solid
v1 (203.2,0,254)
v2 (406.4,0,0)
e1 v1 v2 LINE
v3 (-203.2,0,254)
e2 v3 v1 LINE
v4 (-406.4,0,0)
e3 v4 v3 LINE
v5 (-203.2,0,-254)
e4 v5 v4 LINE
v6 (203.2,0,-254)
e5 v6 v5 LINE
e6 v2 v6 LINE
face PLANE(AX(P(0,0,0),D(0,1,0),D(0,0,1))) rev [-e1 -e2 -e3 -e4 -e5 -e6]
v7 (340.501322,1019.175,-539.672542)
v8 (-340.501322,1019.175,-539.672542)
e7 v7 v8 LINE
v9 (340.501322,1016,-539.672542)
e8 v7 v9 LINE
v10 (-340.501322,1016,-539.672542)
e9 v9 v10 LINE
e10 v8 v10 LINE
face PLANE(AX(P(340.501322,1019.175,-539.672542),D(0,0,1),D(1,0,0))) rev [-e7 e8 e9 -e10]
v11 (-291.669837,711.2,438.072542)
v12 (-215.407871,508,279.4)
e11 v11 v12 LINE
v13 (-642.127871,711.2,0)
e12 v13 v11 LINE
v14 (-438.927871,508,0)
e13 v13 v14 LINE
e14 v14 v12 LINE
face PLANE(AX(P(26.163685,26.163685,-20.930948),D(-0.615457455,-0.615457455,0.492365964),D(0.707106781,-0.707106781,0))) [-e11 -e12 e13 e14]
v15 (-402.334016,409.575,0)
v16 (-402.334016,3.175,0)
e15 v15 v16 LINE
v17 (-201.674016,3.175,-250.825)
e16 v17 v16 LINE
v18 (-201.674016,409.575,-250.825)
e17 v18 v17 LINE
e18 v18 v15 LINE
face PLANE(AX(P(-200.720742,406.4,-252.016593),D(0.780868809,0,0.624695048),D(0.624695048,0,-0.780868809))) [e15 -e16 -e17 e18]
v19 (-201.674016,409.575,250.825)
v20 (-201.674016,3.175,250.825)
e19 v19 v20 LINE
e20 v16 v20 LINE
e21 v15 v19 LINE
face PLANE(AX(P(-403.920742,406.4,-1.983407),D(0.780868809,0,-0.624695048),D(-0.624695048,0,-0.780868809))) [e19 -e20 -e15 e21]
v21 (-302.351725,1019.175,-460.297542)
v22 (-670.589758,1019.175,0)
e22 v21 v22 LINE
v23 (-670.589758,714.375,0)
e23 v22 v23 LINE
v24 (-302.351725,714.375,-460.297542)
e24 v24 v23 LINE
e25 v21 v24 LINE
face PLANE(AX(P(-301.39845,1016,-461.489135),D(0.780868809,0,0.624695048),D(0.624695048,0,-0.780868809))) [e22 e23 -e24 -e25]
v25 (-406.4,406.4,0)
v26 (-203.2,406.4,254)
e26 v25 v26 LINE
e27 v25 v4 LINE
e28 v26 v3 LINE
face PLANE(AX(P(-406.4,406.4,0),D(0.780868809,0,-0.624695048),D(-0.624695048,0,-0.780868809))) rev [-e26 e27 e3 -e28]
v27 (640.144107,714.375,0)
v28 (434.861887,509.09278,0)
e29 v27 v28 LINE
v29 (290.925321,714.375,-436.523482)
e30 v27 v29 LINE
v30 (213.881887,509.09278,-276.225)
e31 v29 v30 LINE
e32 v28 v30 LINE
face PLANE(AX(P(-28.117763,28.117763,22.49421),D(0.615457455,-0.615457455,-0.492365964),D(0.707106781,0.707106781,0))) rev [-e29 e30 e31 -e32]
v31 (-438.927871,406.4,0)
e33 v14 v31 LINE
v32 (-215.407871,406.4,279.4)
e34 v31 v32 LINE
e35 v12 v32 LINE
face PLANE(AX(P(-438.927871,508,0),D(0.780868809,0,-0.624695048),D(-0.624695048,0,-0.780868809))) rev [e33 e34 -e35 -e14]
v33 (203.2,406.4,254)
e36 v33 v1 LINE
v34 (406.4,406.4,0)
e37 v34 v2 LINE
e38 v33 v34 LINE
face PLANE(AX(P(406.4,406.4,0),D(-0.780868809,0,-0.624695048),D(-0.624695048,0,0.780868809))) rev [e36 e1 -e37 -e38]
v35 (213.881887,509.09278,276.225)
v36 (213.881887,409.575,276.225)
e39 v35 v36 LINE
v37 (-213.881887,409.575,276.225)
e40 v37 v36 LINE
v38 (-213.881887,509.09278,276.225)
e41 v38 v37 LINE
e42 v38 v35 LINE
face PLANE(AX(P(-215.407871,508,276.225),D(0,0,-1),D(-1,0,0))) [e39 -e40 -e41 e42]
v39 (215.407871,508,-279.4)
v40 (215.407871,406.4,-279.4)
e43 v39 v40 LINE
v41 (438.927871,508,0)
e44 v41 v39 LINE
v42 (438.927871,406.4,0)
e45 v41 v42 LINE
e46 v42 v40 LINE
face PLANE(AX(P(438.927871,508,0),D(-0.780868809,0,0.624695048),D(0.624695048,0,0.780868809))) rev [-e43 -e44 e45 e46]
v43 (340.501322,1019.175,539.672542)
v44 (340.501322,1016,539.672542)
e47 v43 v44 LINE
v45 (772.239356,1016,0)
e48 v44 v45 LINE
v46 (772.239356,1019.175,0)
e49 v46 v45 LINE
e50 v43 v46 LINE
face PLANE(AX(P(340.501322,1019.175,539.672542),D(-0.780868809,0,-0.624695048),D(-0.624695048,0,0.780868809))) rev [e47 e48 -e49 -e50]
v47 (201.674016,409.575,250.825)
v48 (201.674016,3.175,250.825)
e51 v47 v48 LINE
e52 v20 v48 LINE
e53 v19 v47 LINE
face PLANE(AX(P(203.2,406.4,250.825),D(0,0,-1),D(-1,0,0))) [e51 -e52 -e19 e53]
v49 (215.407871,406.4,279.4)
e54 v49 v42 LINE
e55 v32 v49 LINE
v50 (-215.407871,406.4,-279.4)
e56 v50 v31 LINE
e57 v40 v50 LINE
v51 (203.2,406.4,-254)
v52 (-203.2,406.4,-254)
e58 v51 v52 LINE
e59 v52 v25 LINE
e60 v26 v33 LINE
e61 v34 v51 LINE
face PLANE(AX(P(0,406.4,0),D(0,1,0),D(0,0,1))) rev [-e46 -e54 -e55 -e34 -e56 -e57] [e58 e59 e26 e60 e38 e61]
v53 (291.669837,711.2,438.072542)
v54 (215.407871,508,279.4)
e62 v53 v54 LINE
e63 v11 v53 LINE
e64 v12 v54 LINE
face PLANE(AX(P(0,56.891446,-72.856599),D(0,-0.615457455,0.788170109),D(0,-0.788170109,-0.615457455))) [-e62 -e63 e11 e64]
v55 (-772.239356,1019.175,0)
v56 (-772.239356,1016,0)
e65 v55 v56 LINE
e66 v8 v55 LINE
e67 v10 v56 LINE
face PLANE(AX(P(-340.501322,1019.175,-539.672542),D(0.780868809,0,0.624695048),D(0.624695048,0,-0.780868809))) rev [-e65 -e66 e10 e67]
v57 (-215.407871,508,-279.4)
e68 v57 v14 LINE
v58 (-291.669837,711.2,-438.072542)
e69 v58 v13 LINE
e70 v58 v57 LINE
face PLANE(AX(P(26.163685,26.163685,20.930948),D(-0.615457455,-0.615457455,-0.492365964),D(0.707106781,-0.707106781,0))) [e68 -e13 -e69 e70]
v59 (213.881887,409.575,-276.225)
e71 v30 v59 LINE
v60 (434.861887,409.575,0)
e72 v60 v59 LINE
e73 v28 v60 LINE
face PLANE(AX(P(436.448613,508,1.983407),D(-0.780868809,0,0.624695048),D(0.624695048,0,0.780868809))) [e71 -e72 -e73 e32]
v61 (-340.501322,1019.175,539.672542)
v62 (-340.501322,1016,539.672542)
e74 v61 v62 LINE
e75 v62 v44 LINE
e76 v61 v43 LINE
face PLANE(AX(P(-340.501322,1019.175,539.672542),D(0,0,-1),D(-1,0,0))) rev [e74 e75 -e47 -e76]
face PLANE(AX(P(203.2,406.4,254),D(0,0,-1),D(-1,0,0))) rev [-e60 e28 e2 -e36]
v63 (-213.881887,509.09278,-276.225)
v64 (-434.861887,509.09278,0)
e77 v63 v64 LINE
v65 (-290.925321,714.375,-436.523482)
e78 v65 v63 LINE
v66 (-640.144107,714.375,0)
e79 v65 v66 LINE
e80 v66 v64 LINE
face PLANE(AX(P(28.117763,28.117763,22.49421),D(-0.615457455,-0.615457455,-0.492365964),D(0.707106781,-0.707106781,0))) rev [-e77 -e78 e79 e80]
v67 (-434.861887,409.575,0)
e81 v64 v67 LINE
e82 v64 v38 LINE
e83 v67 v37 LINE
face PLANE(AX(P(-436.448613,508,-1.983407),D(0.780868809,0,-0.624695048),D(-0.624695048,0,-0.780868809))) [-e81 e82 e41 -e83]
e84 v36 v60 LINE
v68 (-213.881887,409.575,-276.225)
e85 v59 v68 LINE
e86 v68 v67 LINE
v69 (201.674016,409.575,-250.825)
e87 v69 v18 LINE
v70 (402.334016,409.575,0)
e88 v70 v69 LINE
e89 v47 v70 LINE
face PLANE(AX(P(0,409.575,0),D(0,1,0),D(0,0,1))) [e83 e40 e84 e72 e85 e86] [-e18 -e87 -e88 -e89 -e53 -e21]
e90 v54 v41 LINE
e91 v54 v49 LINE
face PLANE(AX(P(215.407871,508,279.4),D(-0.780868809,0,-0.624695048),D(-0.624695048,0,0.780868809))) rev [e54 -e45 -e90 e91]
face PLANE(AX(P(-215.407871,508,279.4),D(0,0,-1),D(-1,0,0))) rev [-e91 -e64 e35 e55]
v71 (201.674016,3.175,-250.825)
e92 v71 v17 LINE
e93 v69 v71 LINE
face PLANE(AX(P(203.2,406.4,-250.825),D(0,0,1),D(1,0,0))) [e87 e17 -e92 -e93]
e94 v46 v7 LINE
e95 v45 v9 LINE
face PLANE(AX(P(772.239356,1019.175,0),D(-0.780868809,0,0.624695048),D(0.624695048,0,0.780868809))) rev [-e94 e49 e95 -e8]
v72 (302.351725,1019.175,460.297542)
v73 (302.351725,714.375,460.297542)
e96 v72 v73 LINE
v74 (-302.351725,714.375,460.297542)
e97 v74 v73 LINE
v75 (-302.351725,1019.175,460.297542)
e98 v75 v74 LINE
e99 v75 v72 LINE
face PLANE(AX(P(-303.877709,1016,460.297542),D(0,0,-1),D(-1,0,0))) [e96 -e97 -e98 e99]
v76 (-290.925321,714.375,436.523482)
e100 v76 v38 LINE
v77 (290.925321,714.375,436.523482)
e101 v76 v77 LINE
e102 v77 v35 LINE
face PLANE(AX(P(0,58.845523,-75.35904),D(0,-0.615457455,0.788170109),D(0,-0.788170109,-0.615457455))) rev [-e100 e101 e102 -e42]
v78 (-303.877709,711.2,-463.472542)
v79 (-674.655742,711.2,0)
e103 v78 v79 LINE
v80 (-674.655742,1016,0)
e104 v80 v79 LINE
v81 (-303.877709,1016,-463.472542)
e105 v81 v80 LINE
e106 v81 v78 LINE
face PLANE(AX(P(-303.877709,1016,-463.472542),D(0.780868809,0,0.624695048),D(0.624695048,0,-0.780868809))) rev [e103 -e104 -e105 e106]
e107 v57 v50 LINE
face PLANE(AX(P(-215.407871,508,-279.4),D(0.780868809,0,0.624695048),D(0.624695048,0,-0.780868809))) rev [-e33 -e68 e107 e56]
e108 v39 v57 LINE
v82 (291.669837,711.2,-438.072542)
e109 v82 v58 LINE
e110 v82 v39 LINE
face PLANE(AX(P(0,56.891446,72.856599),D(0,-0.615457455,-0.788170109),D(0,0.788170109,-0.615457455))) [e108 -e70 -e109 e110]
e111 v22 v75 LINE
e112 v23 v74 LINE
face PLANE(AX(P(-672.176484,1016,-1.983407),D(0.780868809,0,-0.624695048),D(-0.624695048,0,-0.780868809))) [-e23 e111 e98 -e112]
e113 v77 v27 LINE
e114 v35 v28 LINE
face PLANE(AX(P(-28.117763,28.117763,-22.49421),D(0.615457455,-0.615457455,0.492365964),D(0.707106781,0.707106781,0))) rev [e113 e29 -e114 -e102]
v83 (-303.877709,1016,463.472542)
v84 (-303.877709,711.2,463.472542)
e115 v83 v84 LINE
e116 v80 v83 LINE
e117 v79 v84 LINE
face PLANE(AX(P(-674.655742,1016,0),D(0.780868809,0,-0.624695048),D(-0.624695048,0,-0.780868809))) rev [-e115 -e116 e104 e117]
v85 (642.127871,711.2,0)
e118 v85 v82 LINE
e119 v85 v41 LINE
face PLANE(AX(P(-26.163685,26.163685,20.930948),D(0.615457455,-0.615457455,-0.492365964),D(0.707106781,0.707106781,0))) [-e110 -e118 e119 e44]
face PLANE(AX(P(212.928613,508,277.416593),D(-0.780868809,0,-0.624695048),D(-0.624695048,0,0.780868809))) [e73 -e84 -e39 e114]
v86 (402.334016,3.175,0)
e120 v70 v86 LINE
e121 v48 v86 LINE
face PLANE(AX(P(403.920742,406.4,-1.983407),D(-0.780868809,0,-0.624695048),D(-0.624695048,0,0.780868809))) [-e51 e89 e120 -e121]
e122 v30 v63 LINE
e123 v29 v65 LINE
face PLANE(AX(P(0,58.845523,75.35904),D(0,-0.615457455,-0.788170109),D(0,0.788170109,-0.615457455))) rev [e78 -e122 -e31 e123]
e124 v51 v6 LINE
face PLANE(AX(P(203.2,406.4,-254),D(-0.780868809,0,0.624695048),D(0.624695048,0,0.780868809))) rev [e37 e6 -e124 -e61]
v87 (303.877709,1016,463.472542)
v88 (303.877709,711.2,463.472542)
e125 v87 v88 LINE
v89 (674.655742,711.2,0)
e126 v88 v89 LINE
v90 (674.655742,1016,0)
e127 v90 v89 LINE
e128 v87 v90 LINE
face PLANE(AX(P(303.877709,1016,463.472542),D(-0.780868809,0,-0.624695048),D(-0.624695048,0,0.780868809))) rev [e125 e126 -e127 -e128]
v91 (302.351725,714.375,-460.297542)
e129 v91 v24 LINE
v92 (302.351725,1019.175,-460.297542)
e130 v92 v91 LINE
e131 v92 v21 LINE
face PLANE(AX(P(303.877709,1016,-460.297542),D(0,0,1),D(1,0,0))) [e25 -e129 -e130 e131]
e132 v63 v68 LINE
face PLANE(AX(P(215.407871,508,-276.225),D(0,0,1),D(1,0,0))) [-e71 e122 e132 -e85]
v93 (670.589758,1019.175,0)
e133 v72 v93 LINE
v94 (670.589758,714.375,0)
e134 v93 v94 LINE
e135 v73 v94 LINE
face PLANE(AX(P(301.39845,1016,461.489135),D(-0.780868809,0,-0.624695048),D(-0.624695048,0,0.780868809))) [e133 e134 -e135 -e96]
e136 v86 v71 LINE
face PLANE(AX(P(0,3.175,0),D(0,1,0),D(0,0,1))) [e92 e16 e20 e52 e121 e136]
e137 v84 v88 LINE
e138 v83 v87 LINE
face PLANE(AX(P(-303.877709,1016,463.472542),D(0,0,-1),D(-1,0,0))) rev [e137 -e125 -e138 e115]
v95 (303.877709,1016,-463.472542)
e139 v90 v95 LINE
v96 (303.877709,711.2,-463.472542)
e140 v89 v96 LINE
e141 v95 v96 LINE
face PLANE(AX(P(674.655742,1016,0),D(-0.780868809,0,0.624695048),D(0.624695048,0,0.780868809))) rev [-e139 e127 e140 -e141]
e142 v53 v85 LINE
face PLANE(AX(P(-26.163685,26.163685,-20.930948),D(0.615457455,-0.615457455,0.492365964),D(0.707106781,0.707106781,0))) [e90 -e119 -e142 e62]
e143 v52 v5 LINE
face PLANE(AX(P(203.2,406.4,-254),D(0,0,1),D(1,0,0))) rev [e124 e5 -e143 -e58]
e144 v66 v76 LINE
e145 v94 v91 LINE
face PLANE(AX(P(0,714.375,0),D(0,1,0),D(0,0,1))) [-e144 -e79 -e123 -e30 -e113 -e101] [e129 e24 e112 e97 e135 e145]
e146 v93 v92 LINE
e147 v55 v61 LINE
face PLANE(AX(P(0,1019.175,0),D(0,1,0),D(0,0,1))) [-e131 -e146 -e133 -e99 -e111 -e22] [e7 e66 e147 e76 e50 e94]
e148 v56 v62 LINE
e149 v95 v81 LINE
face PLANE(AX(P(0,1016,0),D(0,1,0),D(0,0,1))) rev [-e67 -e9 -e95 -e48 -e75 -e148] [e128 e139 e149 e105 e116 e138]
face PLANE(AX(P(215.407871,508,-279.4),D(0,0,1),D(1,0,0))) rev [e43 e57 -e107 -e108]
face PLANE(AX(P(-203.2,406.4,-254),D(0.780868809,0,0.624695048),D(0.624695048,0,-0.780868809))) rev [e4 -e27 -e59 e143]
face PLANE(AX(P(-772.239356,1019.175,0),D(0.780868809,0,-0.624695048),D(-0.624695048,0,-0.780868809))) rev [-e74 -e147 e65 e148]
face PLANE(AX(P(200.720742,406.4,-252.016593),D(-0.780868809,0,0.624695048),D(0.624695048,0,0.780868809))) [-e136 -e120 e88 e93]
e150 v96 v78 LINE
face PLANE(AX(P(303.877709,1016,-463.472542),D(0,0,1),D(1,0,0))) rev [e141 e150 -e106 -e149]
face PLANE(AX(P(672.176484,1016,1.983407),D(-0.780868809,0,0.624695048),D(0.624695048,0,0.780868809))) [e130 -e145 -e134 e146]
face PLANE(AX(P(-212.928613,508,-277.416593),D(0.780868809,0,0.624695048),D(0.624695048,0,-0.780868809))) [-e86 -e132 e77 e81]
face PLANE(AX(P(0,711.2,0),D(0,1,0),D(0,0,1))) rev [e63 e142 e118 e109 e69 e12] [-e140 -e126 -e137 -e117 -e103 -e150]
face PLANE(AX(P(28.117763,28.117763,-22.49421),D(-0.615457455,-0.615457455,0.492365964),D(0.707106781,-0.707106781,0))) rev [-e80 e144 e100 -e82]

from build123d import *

# Parameters (mm, degrees)
BOSS_EXTRUDE1_DEPTH = 406.4
BOSS_EXTRUDE2_DEPTH = 101.6
BOSS_EXTRUDE3_DEPTH = 304.8
BOSS_EXTRUDE4_DEPTH = 3.175
SHELL3_START        = 3.175
SHELL3_DEPTH        = 1016
SHELL3_START_2      = 714.375
SHELL3_2_DEPTH      = 304.8
SHELL3_START_3      = 409.575
SHELL3_3_DEPTH      = 304.8


with BuildPart() as part:
    # Sketch2 → Boss-Extrude1 (new body)
    with BuildSketch(Plane(origin=(0, 0, 0), x_dir=(1, 0, 0), z_dir=(0, 1, 0))):
        Polygon((-203.2, 254), (-406.4, 0), (-203.2, -254), (203.2, -254), (406.4, 0), (203.2, 254), align=None)
    extrude(amount=BOSS_EXTRUDE1_DEPTH)

    # Sketch3 → Boss-Extrude2 (add)
    with BuildSketch(Plane(origin=(0, 406.4, 0), x_dir=(1, 0, 0), z_dir=(0, 1, 0))):
        Polygon((215.407871126, 279.4), (-215.407871126, 279.4), (-438.927871126, 0), (-215.407871126, -279.4), (215.407871126, -279.4), (438.927871126, 0), align=None)
    extrude(amount=BOSS_EXTRUDE2_DEPTH)

    # Sketch5 → Loft1 section 0
    with BuildSketch(Plane(origin=(0, 711.2, 0), x_dir=(1, 0, 0), z_dir=(0, 1, 0))):
        with BuildLine():
            Line((642.127871126, 0), (291.669837463, 438.072542079))
            Line((291.669837463, 438.072542079), (-291.669837463, 438.072542079))
            Line((-291.669837463, 438.072542079), (-642.127871126, 0))
            Line((-642.127871126, 0), (-291.669837463, -438.072542079))
            Line((-291.669837463, -438.072542079), (291.669837463, -438.072542079))
            Line((291.669837463, -438.072542079), (642.127871126, 0))
        make_face()
    # Sketch4 → Loft1 section 1
    with BuildSketch(Plane(origin=(0, 508, 0), x_dir=(1, 0, 0), z_dir=(0, 1, 0))):
        with BuildLine():
            Line((438.927871126, 0), (215.407871126, 279.4))
            Line((215.407871126, 279.4), (-215.407871126, 279.4))
            Line((-215.407871126, 279.4), (-438.927871126, 0))
            Line((-438.927871126, 0), (-215.407871126, -279.4))
            Line((-215.407871126, -279.4), (215.407871126, -279.4))
            Line((215.407871126, -279.4), (438.927871126, 0))
        make_face()
    loft()

    # Sketch6 → Boss-Extrude3 (add)
    with BuildSketch(Plane(origin=(0, 711.2, 0), x_dir=(1, 0, 0), z_dir=(0, 1, 0))):
        Polygon((303.877708589, -463.472542079), (674.655742252, 0), (303.877708589, 463.472542079), (-303.877708589, 463.472542079), (-674.655742252, 0), (-303.877708589, -463.472542079), align=None)
    extrude(amount=BOSS_EXTRUDE3_DEPTH)

    # Sketch7 → Boss-Extrude4 (add)
    with BuildSketch(Plane(origin=(0, 1016, 0), x_dir=(1, 0, 0), z_dir=(0, 1, 0))):
        Polygon((-340.501321968, -539.672542079), (340.501321968, -539.672542079), (772.239355631, 0), (340.501321968, 539.672542079), (-340.501321968, 539.672542079), (-772.239355631, 0), align=None)
    extrude(amount=BOSS_EXTRUDE4_DEPTH)

    # Shell3: read off the stored shape, not the designer's step
    # Shell3 outline → Shell3 (cut)
    with BuildSketch(Plane(origin=(0, 0, 0), x_dir=(1, 0, 0), z_dir=(0, 1, 0)).offset(SHELL3_START)):
        Polygon((201.674016109, 250.825), (-201.674016109, 250.825), (-402.334016109, 0), (-201.674016109, -250.825), (201.674016109, -250.825), (402.334016109, 0), align=None)
    extrude(amount=SHELL3_DEPTH, mode=Mode.SUBTRACT)

    # Shell3 2 outline → Shell3 2 (cut)
    with BuildSketch(Plane(origin=(0, 0, 0), x_dir=(1, 0, 0), z_dir=(0, 1, 0)).offset(SHELL3_START_2)):
        Polygon((-302.351724698, -460.297542079), (302.351724698, -460.297542079), (670.589758362, 0), (302.351724698, 460.297542079), (-302.351724698, 460.297542079), (-670.589758362, 0), align=None)
        Polygon((-402.334016109, 0), (-201.674016109, 250.825), (201.674016109, 250.825), (402.334016109, 0), (201.674016109, -250.825), (-201.674016109, -250.825), align=None, mode=Mode.SUBTRACT)
    extrude(amount=SHELL3_2_DEPTH, mode=Mode.SUBTRACT)

    # Shell3 3 outline → Shell3 3 (cut)
    with BuildSketch(Plane(origin=(0, 0, 0), x_dir=(1, 0, 0), z_dir=(0, 1, 0)).offset(SHELL3_START_3)):
        Polygon((434.861887235, 0), (213.881887235, 276.225), (-213.881887235, 276.225), (-434.861887235, 0), (-213.881887235, -276.225), (213.881887235, -276.225), align=None)
        Polygon((-402.334016109, 0), (-201.674016109, 250.825), (201.674016109, 250.825), (402.334016109, 0), (201.674016109, -250.825), (-201.674016109, -250.825), align=None, mode=Mode.SUBTRACT)
    extrude(amount=SHELL3_3_DEPTH, mode=Mode.SUBTRACT)

    # Shell3 4: loft between two sections, ruled curve by curve
    shell3_4_from = [
        Edge.make_line((-213.881887235, 509.092780496, -276.225), (-434.861887235, 509.092780496, 0)),
        Edge.make_line((-434.861887235, 509.092780496, 0), (-213.881887235, 509.092780496, 276.225)),
        Edge.make_line((213.881887235, 509.092780496, -276.225), (-213.881887235, 509.092780496, -276.225)),
        Edge.make_line((434.861887235, 509.092780496, 0), (213.881887235, 509.092780496, -276.225)),
        Edge.make_line((213.881887235, 509.092780496, 276.225), (434.861887235, 509.092780496, 0)),
        Edge.make_line((-213.881887235, 509.092780496, 276.225), (213.881887235, 509.092780496, 276.225)),
    ]
    shell3_4_to = [
        Edge.make_line((-290.925320864, 714.375, -436.523482344), (-640.144106739, 714.375, 0)),
        Edge.make_line((-640.144106739, 714.375, 0), (-290.925320864, 714.375, 436.523482344)),
        Edge.make_line((290.925320864, 714.375, -436.523482344), (-290.925320864, 714.375, -436.523482344)),
        Edge.make_line((640.144106739, 714.375, 0), (290.925320864, 714.375, -436.523482344)),
        Edge.make_line((290.925320864, 714.375, 436.523482344), (640.144106739, 714.375, 0)),
        Edge.make_line((-290.925320864, 714.375, 436.523482344), (290.925320864, 714.375, 436.523482344)),
    ]
    shell3_4 = Solid(Shell([*[Face.make_surface_from_curves(shell3_4_from[k], shell3_4_to[k]) for k in range(6)], Face(Wire(shell3_4_from)), Face(Wire(shell3_4_to))]))
    add(shell3_4, mode=Mode.SUBTRACT)


solid = part.part
